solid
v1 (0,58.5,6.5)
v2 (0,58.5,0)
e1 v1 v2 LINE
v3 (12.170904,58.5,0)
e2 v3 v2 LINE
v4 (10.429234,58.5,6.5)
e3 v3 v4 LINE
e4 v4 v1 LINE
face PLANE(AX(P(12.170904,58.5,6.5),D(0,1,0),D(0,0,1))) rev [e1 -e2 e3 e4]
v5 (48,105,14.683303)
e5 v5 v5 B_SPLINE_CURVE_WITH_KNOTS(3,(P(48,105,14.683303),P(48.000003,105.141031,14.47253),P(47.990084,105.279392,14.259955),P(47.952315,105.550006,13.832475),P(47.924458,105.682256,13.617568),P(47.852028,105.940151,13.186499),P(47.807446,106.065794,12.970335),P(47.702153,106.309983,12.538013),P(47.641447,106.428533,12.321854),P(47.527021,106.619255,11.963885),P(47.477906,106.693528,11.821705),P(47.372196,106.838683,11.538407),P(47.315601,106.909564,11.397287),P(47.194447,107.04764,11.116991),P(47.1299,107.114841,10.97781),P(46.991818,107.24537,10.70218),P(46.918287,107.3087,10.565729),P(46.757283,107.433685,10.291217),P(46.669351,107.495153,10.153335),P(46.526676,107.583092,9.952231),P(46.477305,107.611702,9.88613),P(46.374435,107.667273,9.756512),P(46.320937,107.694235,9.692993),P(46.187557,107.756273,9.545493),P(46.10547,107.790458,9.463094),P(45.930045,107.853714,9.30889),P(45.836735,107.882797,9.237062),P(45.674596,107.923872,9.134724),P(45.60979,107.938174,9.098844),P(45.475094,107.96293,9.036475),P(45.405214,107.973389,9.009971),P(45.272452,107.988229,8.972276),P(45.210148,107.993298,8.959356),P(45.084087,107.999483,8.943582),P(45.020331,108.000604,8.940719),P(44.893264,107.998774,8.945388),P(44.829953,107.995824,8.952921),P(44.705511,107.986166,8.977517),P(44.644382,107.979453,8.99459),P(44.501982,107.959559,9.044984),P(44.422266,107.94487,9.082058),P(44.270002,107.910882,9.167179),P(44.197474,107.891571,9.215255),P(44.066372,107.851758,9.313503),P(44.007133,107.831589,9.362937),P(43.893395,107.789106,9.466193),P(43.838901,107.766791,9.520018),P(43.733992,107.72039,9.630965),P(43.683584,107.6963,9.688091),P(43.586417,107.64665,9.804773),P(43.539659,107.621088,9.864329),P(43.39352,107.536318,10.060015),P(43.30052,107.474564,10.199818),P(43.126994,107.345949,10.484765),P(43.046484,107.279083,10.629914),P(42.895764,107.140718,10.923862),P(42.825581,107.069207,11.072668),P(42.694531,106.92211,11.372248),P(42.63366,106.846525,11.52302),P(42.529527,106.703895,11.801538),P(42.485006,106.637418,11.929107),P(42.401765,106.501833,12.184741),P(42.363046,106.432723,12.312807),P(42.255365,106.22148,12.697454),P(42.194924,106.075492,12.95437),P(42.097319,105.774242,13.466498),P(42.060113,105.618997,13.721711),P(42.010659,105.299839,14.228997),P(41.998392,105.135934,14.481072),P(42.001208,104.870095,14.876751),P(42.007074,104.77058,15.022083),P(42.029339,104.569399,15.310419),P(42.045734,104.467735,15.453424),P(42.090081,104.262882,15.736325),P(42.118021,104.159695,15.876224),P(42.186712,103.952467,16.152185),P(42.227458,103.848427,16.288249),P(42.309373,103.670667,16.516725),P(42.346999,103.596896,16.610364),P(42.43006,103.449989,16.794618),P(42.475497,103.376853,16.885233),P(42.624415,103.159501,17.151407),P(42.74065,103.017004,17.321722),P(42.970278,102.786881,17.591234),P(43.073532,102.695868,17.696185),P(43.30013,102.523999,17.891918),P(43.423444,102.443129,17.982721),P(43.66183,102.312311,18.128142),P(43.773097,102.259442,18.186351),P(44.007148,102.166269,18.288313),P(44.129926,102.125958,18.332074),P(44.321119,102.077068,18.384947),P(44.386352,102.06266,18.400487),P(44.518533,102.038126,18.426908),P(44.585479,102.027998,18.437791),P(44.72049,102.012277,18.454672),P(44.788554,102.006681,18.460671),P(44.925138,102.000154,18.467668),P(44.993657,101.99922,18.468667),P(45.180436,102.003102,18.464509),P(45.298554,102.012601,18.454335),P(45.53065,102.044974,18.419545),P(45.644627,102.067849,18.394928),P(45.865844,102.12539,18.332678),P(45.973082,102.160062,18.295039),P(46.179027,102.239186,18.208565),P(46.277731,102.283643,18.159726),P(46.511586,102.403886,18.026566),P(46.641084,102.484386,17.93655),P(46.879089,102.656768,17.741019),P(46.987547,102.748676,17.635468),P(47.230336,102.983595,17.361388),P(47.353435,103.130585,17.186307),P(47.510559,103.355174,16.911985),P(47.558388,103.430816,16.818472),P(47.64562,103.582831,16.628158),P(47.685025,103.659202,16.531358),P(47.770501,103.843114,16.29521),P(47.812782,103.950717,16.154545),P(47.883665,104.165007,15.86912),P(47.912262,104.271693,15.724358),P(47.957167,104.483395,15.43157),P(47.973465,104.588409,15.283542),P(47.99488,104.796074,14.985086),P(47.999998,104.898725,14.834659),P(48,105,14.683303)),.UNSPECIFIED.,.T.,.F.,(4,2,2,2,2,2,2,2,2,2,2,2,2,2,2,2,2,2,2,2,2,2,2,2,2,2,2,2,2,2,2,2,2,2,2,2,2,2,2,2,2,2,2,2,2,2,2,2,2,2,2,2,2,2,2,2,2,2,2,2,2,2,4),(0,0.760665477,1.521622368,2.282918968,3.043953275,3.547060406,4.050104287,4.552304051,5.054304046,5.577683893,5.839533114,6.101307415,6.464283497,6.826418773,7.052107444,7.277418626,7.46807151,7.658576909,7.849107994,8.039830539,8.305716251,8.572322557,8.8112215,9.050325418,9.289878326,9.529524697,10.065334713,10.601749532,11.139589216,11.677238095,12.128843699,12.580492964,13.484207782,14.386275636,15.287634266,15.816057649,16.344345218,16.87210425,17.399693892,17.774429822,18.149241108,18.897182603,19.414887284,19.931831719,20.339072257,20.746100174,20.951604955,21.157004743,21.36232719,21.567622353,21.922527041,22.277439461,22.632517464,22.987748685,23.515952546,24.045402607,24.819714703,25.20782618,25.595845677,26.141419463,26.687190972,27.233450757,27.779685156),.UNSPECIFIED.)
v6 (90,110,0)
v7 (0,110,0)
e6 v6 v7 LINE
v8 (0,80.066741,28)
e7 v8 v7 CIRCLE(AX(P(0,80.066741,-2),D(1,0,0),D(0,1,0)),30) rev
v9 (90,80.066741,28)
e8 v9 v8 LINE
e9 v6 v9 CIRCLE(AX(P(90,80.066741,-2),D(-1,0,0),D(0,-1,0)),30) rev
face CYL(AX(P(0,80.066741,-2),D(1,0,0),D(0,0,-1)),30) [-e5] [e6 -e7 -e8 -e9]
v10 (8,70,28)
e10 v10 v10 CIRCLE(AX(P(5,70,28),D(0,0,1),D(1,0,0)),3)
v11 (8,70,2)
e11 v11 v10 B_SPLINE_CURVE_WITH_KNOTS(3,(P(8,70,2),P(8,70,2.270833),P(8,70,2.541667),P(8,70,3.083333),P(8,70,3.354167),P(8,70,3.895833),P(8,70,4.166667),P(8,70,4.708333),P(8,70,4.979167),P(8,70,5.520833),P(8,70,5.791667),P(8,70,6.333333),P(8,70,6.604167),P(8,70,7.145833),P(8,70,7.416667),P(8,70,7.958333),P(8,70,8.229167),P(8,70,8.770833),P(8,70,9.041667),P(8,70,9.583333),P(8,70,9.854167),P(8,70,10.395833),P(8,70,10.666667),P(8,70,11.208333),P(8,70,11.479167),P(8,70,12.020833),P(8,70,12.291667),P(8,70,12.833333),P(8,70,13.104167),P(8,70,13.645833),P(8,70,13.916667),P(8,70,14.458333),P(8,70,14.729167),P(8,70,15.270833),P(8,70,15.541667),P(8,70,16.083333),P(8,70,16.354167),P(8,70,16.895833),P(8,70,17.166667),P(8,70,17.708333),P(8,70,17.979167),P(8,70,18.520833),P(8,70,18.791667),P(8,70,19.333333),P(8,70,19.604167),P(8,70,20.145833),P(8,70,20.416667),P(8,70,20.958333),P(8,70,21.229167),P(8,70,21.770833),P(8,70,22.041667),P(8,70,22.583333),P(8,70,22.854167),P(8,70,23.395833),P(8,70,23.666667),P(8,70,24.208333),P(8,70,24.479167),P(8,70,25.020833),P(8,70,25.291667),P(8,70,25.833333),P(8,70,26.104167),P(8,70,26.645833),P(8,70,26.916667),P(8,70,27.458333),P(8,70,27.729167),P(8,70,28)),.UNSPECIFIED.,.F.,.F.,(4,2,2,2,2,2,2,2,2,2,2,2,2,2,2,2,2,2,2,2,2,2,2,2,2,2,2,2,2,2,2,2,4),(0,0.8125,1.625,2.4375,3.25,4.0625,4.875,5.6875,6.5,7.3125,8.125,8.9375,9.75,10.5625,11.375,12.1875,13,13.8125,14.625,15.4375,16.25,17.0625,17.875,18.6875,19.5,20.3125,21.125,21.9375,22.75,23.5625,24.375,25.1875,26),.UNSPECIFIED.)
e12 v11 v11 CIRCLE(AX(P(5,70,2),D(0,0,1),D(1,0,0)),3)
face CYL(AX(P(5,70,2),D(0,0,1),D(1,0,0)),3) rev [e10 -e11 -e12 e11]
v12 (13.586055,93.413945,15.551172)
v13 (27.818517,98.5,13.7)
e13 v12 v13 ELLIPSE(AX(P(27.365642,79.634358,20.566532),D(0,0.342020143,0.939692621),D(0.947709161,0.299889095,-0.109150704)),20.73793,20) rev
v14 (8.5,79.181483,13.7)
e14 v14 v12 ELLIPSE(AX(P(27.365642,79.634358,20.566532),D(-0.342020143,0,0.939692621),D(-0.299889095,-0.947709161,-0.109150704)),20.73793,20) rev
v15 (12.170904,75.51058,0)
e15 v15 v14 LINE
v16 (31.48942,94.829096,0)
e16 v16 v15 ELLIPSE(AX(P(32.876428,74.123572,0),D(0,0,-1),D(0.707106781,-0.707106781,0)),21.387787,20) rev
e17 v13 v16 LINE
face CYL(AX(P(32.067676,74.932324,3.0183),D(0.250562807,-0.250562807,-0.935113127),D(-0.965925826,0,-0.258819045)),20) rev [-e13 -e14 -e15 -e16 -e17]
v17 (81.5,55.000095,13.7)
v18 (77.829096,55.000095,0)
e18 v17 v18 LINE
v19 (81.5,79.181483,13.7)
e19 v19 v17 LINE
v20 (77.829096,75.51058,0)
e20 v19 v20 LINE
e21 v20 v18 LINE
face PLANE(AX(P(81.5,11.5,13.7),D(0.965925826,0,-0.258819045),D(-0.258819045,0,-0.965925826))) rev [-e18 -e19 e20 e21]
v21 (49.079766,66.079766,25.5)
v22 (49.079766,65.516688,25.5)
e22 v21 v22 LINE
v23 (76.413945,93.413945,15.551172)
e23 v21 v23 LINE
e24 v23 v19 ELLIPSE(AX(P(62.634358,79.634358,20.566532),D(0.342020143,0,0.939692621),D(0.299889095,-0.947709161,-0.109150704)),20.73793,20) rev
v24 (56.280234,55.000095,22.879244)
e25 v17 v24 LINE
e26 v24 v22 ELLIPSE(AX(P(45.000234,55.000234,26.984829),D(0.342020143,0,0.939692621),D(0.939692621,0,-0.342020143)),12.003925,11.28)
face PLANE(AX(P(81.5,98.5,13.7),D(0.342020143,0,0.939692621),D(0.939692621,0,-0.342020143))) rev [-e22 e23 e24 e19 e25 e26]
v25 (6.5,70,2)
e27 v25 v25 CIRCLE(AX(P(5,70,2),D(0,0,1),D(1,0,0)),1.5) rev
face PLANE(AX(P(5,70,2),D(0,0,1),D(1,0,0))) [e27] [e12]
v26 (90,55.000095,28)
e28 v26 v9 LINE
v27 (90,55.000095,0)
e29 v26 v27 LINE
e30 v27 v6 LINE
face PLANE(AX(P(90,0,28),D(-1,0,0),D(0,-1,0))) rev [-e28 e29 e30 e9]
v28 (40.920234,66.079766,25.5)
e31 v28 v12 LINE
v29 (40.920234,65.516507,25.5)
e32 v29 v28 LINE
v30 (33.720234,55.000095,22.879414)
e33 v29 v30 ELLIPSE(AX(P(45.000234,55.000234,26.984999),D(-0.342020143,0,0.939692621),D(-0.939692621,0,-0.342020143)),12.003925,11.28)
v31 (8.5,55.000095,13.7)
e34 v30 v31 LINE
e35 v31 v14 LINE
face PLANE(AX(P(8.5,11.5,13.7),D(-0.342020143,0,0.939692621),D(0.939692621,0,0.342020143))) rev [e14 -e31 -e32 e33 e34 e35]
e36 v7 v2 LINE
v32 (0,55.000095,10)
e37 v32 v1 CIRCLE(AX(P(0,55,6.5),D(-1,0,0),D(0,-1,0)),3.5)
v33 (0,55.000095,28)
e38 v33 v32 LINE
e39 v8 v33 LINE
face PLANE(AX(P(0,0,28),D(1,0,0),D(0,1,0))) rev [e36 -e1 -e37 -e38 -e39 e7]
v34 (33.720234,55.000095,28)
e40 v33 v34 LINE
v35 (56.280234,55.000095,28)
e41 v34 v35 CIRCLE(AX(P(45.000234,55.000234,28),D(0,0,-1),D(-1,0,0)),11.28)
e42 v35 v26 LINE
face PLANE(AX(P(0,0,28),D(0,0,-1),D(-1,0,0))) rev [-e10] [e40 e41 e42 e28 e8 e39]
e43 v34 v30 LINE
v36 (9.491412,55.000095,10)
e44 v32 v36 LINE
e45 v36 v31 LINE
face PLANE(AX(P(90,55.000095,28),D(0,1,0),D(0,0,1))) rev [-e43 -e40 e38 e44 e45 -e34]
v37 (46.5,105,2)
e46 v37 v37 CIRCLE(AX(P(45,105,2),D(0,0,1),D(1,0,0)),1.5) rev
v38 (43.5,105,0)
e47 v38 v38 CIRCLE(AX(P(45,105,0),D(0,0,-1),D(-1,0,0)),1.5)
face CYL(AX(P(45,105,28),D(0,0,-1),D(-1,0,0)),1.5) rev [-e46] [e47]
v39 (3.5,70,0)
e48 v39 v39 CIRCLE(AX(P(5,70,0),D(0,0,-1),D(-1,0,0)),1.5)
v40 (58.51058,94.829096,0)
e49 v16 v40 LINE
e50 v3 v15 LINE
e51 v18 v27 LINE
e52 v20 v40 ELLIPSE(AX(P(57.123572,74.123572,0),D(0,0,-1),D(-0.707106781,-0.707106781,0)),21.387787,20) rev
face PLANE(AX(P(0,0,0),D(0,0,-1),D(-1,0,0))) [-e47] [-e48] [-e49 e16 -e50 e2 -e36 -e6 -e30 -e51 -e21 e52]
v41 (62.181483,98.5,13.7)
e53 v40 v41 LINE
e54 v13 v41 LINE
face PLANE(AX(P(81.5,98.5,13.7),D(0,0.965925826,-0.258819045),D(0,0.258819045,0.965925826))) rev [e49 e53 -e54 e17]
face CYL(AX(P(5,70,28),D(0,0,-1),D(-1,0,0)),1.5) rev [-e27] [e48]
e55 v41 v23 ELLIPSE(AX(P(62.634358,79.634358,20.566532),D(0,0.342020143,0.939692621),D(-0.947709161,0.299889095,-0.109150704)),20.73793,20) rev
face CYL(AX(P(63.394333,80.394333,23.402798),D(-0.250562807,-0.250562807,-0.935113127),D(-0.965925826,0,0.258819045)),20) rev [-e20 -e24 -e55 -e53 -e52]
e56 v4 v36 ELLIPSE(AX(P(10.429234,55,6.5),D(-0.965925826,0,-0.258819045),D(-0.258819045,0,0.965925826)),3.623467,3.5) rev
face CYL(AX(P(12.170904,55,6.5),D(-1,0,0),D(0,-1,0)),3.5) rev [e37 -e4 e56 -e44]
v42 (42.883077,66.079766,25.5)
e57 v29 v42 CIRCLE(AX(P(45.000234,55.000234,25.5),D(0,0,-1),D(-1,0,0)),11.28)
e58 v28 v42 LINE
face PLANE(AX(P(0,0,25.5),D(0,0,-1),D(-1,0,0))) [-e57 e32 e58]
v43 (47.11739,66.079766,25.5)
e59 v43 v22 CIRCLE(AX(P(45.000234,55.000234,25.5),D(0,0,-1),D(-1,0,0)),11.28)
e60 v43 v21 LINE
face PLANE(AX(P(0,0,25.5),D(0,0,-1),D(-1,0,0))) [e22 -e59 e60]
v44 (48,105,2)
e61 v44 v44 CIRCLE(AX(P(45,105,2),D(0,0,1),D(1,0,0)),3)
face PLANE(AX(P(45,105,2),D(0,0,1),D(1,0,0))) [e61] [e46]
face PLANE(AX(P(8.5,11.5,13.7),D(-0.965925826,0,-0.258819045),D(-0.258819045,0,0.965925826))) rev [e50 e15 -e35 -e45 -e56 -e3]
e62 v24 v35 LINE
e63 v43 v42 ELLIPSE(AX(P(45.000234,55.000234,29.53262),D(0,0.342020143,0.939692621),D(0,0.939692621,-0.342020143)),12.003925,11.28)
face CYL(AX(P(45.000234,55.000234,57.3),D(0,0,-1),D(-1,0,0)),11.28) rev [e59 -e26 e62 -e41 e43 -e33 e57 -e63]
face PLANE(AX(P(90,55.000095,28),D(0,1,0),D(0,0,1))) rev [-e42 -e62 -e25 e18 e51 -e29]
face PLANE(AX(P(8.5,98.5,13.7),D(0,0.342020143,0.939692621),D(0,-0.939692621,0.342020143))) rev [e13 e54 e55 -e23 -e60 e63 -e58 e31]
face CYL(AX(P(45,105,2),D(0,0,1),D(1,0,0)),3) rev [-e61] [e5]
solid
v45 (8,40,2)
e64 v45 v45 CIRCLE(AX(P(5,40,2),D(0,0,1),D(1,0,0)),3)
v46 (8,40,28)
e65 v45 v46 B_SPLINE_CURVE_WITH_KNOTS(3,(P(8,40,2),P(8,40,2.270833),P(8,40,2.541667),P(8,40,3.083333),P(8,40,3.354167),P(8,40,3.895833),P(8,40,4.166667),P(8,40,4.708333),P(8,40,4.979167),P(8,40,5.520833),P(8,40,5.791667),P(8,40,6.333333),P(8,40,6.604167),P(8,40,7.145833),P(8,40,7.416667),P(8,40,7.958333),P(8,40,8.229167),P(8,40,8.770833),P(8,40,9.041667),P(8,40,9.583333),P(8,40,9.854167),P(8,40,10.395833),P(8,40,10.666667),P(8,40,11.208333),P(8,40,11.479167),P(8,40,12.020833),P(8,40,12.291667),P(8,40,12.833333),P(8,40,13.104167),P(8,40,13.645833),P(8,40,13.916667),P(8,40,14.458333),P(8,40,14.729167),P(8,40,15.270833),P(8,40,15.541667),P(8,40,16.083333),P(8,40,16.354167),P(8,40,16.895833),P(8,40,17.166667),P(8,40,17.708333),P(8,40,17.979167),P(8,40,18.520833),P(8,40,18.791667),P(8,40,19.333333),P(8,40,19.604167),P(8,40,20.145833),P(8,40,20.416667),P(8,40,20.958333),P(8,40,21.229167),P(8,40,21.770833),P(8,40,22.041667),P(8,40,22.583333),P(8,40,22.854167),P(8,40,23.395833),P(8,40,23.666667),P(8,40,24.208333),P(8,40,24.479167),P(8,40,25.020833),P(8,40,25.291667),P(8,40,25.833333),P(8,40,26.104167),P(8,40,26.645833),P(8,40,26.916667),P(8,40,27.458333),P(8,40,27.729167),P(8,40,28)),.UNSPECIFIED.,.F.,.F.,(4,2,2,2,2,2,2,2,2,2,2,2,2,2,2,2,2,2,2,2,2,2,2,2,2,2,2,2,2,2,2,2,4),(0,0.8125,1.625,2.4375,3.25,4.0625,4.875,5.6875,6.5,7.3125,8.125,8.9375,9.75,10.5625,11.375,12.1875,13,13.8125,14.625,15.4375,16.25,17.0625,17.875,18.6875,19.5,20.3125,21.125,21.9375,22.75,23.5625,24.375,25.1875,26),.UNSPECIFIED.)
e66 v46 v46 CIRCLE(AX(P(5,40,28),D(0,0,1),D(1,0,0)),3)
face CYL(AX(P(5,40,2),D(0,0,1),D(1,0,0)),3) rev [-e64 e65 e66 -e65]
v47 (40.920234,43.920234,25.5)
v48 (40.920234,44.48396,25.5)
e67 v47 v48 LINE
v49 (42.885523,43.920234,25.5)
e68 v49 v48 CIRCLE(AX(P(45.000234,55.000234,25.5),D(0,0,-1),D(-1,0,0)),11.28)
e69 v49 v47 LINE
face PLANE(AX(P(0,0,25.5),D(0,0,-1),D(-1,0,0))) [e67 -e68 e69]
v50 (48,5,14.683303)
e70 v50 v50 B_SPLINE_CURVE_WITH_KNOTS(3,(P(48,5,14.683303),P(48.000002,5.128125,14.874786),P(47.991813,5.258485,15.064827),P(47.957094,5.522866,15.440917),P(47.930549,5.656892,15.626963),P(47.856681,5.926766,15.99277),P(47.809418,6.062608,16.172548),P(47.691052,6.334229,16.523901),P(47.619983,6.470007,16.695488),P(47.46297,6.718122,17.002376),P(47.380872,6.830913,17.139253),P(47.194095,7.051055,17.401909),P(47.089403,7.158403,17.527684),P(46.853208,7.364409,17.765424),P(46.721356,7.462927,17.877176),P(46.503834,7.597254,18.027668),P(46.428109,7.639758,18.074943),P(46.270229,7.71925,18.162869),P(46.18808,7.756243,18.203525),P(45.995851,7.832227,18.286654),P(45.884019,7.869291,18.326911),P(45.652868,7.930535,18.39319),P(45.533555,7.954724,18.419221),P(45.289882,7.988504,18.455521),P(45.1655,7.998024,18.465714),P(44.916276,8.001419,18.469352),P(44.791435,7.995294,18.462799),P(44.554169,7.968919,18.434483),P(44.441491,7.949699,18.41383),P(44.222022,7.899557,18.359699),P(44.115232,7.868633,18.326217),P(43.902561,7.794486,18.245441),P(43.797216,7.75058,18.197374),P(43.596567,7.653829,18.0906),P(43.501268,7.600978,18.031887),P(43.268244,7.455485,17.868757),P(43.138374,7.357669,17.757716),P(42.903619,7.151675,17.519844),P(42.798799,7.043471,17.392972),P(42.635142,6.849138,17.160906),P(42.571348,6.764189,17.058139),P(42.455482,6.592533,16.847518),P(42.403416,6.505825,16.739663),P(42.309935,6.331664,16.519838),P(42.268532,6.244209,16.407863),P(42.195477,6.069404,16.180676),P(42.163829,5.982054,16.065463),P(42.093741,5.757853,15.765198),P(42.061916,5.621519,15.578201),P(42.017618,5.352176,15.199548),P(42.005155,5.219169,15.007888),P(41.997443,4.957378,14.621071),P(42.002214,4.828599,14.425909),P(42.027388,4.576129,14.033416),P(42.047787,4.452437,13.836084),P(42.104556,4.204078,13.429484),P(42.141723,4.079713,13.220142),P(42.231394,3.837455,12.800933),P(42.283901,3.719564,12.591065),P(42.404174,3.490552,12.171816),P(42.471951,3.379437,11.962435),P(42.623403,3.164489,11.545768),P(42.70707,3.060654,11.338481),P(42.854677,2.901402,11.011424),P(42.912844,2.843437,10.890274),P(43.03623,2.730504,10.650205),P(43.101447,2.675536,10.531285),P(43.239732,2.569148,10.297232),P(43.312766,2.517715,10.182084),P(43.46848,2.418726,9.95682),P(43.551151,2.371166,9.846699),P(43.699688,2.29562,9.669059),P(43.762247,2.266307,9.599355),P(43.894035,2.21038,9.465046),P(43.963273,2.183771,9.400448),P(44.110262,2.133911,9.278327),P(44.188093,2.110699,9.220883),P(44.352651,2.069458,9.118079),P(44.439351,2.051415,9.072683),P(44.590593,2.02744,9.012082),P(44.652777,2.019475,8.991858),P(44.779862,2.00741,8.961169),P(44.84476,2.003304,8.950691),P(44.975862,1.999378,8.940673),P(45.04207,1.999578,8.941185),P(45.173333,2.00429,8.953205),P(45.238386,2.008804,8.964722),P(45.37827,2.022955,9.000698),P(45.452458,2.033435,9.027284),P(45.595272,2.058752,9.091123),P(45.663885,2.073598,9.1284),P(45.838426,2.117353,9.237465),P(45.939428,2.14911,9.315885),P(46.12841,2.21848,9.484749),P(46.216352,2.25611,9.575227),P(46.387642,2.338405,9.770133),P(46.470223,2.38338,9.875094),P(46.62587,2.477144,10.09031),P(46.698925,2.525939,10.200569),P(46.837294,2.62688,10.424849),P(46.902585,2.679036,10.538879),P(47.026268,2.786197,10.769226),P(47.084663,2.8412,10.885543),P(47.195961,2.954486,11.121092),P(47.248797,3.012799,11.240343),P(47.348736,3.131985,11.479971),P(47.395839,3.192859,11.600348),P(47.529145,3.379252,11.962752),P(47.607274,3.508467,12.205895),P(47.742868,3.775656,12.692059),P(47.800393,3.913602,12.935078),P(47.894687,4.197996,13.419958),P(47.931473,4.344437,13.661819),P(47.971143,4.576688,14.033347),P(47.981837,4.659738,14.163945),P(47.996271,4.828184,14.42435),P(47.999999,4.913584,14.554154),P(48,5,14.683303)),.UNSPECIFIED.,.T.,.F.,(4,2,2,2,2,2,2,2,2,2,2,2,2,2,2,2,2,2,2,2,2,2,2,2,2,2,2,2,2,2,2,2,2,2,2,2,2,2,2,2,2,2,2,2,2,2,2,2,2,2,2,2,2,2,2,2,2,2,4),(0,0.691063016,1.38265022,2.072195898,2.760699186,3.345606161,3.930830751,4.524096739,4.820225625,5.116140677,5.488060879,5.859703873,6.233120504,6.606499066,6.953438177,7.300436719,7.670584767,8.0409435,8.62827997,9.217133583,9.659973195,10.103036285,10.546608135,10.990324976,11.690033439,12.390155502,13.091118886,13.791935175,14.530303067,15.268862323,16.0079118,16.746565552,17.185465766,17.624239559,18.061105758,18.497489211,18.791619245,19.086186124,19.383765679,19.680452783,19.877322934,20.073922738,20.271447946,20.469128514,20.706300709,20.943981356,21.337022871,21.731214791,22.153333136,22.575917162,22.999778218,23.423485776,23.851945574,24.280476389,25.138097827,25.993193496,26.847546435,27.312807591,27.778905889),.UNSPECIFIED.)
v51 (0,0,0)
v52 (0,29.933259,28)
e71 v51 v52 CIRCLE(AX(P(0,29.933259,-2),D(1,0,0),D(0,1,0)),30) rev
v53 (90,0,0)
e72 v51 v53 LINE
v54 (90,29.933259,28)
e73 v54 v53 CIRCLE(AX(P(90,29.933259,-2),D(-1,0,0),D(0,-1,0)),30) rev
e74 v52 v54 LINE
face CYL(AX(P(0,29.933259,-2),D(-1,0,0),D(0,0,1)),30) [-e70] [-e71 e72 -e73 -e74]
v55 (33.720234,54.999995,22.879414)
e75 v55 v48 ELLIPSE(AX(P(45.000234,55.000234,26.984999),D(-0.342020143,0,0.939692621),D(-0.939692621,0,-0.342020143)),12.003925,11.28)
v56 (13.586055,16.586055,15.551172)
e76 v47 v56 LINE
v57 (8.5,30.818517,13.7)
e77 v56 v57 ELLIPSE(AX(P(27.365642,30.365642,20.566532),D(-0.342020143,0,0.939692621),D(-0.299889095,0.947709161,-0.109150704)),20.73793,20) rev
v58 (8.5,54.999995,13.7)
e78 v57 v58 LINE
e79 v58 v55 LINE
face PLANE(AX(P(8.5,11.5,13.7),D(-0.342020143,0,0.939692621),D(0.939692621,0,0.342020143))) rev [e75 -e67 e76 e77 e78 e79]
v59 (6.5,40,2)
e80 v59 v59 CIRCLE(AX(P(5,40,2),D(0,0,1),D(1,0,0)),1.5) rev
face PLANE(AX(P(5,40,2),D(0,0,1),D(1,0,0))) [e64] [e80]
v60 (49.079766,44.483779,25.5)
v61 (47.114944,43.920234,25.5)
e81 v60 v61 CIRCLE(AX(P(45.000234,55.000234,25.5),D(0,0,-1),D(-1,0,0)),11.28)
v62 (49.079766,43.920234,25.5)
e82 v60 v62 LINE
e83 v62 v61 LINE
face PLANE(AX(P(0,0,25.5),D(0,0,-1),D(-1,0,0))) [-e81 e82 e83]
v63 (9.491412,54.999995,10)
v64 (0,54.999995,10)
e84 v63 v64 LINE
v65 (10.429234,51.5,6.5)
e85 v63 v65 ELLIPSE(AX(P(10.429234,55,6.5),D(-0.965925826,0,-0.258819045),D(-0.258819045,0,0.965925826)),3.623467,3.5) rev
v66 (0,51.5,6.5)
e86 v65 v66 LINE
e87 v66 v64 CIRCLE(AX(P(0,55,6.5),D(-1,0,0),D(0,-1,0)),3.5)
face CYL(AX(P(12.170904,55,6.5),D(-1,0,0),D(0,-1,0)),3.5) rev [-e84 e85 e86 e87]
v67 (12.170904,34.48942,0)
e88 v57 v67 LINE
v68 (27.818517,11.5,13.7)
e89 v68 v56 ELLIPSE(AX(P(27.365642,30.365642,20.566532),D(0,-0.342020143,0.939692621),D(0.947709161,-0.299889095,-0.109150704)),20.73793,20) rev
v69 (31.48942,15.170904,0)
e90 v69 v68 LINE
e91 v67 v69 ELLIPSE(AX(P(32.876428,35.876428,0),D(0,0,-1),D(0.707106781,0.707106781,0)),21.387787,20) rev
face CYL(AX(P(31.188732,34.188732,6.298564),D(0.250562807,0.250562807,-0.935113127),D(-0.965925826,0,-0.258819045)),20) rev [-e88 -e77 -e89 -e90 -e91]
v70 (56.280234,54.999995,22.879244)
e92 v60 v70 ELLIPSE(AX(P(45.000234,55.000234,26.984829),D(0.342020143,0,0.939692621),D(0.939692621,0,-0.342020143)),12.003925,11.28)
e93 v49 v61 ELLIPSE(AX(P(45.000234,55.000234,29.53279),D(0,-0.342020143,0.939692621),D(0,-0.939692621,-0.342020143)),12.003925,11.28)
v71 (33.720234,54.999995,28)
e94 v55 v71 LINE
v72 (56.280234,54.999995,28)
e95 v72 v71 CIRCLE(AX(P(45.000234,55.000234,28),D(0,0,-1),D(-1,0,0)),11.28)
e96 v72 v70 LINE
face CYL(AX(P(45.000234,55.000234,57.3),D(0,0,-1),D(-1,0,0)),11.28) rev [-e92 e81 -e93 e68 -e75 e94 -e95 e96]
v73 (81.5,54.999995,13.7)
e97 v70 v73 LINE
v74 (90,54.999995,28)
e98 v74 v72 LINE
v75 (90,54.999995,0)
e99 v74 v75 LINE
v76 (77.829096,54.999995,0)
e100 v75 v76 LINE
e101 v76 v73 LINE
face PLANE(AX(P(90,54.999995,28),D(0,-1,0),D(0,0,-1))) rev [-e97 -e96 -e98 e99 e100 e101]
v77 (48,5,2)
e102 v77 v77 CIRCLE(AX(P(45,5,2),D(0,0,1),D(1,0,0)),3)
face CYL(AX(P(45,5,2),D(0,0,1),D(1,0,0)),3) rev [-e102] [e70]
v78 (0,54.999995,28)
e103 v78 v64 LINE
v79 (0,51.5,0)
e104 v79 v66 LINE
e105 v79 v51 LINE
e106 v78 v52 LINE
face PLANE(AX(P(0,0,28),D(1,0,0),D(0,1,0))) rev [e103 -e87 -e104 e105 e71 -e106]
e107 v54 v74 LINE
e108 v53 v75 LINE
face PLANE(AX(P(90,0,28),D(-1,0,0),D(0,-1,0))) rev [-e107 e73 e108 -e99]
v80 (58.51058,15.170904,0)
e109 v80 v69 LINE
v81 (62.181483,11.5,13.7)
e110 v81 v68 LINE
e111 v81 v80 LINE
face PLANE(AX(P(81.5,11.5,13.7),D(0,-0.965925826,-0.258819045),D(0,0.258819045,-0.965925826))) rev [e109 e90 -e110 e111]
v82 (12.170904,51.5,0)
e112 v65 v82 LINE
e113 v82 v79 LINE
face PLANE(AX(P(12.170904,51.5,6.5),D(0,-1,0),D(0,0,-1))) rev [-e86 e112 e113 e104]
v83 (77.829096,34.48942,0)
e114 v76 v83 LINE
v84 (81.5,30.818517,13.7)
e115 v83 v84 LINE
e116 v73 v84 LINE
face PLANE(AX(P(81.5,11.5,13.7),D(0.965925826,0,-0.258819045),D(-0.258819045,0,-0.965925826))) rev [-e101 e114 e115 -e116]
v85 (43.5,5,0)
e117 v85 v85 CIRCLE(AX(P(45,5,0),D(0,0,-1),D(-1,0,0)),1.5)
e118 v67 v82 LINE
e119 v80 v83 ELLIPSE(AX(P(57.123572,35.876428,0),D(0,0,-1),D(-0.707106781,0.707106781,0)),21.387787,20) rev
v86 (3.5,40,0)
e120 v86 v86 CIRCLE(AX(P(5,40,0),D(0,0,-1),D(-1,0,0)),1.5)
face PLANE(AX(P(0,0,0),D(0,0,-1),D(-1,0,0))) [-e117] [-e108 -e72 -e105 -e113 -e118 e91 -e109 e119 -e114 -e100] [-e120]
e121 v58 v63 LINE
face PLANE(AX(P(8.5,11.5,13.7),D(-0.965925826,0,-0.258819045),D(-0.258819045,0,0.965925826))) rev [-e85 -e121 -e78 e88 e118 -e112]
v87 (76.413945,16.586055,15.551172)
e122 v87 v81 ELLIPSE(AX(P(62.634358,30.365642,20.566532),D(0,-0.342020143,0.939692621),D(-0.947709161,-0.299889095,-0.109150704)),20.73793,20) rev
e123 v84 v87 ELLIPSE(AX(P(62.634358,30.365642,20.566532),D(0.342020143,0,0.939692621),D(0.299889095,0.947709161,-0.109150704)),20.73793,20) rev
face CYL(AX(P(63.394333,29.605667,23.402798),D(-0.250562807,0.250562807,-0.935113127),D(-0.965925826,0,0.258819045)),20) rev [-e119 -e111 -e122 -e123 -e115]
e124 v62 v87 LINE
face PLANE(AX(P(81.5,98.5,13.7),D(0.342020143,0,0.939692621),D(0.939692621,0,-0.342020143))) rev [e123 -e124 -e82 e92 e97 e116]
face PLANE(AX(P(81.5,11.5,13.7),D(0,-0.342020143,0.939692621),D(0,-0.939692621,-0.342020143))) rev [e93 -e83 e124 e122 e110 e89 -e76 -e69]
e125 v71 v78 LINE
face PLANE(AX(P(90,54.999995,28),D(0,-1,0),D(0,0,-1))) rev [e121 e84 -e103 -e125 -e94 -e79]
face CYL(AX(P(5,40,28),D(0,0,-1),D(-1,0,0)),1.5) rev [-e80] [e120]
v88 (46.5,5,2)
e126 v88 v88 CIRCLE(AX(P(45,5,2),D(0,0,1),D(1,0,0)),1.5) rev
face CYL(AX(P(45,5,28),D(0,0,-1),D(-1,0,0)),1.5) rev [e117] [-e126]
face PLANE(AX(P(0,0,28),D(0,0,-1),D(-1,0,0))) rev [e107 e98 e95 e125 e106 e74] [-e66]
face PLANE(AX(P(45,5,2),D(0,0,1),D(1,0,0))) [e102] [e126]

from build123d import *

# Parameters (mm, degrees)
SKETCH1_W           = 90
SKETCH1_H           = 110
BOSS_EXTRUDE1_DEPTH = 28
FILLET2_R           = 30
SKETCH3_R           = 1.5
CUT_EXTRUDE1_DEPTH  = 145.858551698
SKETCH4_R           = 3
CUT_EXTRUDE4_DEPTH  = 26
CUT_EXTRUDE5_START  = -13.7
SKETCH5_W           = 73
SKETCH5_H           = 87
CUT_EXTRUDE5_DEPTH  = 13.7
CUT_EXTRUDE5_TAPER  = 15
SKETCH8_W           = 73
SKETCH8_H           = 87
CUT_EXTRUDE8_DEPTH  = 11.8
CUT_EXTRUDE8_DRAFT  = -70
CUT_EXTRUDE9_START  = 30
SKETCH9_R           = 11.28
CUT_EXTRUDE9_DEPTH  = 61.8
FILLET19_R          = 20
CUT_EXTRUDE10_START = 54.999995
CUT_EXTRUDE10_DEPTH = 0.0001
CUT_EXTRUDE12_REACH = 146.859


# Read off the part's stored shape, not the designer's step: Cut-Extrude10
with BuildPart() as part:
    # Sketch1 → Boss-Extrude1 (new body)
    with BuildSketch(Plane.XY):
        with Locations((45, 55)):
            Rectangle(SKETCH1_W, SKETCH1_H)
    extrude(amount=BOSS_EXTRUDE1_DEPTH)

    # Fillet2
    # the kernel refuses this fillet: 30 mm, written as the material it takes off along each edge
    with BuildSketch(Plane(origin=(-74.833147735, 0, 28), x_dir=(0, 0, -1), z_dir=(1, 0, 0)), Plane(origin=(164.833147735, 110, 28), x_dir=(0, 0, -1), z_dir=(-1, 0, 0))) as fillet2_piece_1:
        with BuildLine():
            CenterArc((30, 29.933259094), FILLET2_R, 180, 86.177446271)
            Line((0, 29.933259094), (-0.6, 29.933259094))
            Line((-0.6, 29.933259094), (-0.6, 0))
            Line((-0.6, 0), (0, -0.6))
            ThreePointArc((0, -0.6), (14, -0.6), (27.96, -0.598665182))
            Line((27.96, -0.598665182), (28, 0))
        make_face()
    extrude(amount=239.666295471, mode=Mode.SUBTRACT)

    # Sketch3 → Cut-Extrude1 (cut, through all)
    with BuildSketch(Plane(origin=(0, 0, 0), x_dir=(-1, 0, 0), z_dir=(0, 0, -1))):
        with Locations((-45, 105)):
            Circle(SKETCH3_R)
        with Locations((-45, 5)):
            Circle(SKETCH3_R)
        with Locations((-5, 70)):
            Circle(SKETCH3_R)
        with Locations((-5, 40)):
            Circle(SKETCH3_R)
    extrude(amount=-CUT_EXTRUDE1_DEPTH, mode=Mode.SUBTRACT)

    # Sketch4 → Cut-Extrude4 (cut)
    with BuildSketch(Plane.XY.offset(28)):
        with Locations((45, 105)):
            Circle(SKETCH4_R)
        with Locations((45, 5)):
            Circle(SKETCH4_R)
        with Locations((5, 70)):
            Circle(SKETCH4_R)
        with Locations((5, 40)):
            Circle(SKETCH4_R)
    extrude(amount=-CUT_EXTRUDE4_DEPTH, mode=Mode.SUBTRACT)

    # Sketch5 → Cut-Extrude5 (cut)
    with BuildSketch(Plane(origin=(0, 0, 0), x_dir=(-1, 0, 0), z_dir=(0, 0, -1)).offset(CUT_EXTRUDE5_START)):
        with Locations((-45, 55)):
            Rectangle(SKETCH5_W, SKETCH5_H)
    extrude(amount=CUT_EXTRUDE5_DEPTH, taper=CUT_EXTRUDE5_TAPER, mode=Mode.SUBTRACT)


with BuildPart() as cut_extrude8_tool:
    # Sketch8 → Cut-Extrude8 (with draft: the straight prism first)
    with BuildSketch(Plane(origin=(0, 0, 13.7), x_dir=(-1, 0, 0), z_dir=(0, 0, -1))):
        with Locations((-45, 55)):
            Rectangle(SKETCH8_W, SKETCH8_H)
    extrude(amount=-CUT_EXTRUDE8_DEPTH)
    # Cut-Extrude8: the draft: its side faces are tilted about the plane it starts from
    cut_extrude8_sides = [cut_extrude8_tool.faces().sort_by_distance(p)[0] for p in [
        (81.5, 55, 19.6),
        (45, 11.5, 19.6),
        (8.5, 55, 19.6),
        (45, 98.5, 19.6),
    ]]
    draft(cut_extrude8_sides, Plane(origin=(0, 0, 13.7), x_dir=(-1, 0, 0), z_dir=(0, 0, -1)), CUT_EXTRUDE8_DRAFT)


with BuildPart() as part_1:
    add(part.part)

    # Cut-Extrude8: cut by cut_extrude8_tool
    add(cut_extrude8_tool.part, mode=Mode.SUBTRACT)

    # Sketch9 → Cut-Extrude9 (cut)
    with BuildSketch(Plane(origin=(0, 0, 25.5), x_dir=(-1, 0, 0), z_dir=(0, 0, -1)).offset(CUT_EXTRUDE9_START)):
        with Locations((-45.00023355, 55.00023355)):
            Circle(SKETCH9_R)
    extrude(amount=-CUT_EXTRUDE9_DEPTH, mode=Mode.SUBTRACT)

    # Fillet19
    fillet19_edges = [part_1.edges().sort_by_distance(p)[0] for p in [
        (79.664548032, 96.664548032, 6.85),
        (79.664548032, 13.335451968, 6.85),
        (10.335451968, 13.335451968, 6.85),
        (10.335451968, 96.664548032, 6.85),
    ]]
    fillet(fillet19_edges, radius=FILLET19_R)

    # Cut-Extrude10 outline → Cut-Extrude10 (cut)
    with BuildSketch(Plane(origin=(0, 0, 0), x_dir=(1, 0, 0), z_dir=(0, 1, 0)).offset(CUT_EXTRUDE10_START)):
        Polygon((90, -28), (90, 0), (77.829096064, 0), (12.170903936, 0), (0, 0), (0, -28), align=None)
    extrude(amount=CUT_EXTRUDE10_DEPTH, mode=Mode.SUBTRACT)

    # Cut-Extrude12: up to this plane
    cut_extrude12_end = Plane(origin=(8.5, 11.5, 13.7), z_dir=(-0.9659258262890681, 0, -0.25881904510252135))
    # Sketch14 → Cut-Extrude12 (cut, up to the surface)
    with BuildSketch(Plane.ZY, mode=Mode.PRIVATE) as cut_extrude12_sk1:
        with BuildLine():
            Line((6.5, 58.5), (0, 58.5))
            Line((0, 58.5), (0, 51.5))
            Line((0, 51.5), (6.5, 51.5))
            ThreePointArc((6.5, 51.5), (10, 55), (6.5, 58.5))
        make_face()
    cut_extrude12_tool1 = split(extrude(cut_extrude12_sk1.sketch, amount=-CUT_EXTRUDE12_REACH, mode=Mode.PRIVATE), bisect_by=cut_extrude12_end, keep=Keep.BOTH, mode=Mode.PRIVATE)
    add(cut_extrude12_tool1.solids().sort_by_distance((0, 55, 4.657437))[0], mode=Mode.SUBTRACT)


solid = part_1.part
